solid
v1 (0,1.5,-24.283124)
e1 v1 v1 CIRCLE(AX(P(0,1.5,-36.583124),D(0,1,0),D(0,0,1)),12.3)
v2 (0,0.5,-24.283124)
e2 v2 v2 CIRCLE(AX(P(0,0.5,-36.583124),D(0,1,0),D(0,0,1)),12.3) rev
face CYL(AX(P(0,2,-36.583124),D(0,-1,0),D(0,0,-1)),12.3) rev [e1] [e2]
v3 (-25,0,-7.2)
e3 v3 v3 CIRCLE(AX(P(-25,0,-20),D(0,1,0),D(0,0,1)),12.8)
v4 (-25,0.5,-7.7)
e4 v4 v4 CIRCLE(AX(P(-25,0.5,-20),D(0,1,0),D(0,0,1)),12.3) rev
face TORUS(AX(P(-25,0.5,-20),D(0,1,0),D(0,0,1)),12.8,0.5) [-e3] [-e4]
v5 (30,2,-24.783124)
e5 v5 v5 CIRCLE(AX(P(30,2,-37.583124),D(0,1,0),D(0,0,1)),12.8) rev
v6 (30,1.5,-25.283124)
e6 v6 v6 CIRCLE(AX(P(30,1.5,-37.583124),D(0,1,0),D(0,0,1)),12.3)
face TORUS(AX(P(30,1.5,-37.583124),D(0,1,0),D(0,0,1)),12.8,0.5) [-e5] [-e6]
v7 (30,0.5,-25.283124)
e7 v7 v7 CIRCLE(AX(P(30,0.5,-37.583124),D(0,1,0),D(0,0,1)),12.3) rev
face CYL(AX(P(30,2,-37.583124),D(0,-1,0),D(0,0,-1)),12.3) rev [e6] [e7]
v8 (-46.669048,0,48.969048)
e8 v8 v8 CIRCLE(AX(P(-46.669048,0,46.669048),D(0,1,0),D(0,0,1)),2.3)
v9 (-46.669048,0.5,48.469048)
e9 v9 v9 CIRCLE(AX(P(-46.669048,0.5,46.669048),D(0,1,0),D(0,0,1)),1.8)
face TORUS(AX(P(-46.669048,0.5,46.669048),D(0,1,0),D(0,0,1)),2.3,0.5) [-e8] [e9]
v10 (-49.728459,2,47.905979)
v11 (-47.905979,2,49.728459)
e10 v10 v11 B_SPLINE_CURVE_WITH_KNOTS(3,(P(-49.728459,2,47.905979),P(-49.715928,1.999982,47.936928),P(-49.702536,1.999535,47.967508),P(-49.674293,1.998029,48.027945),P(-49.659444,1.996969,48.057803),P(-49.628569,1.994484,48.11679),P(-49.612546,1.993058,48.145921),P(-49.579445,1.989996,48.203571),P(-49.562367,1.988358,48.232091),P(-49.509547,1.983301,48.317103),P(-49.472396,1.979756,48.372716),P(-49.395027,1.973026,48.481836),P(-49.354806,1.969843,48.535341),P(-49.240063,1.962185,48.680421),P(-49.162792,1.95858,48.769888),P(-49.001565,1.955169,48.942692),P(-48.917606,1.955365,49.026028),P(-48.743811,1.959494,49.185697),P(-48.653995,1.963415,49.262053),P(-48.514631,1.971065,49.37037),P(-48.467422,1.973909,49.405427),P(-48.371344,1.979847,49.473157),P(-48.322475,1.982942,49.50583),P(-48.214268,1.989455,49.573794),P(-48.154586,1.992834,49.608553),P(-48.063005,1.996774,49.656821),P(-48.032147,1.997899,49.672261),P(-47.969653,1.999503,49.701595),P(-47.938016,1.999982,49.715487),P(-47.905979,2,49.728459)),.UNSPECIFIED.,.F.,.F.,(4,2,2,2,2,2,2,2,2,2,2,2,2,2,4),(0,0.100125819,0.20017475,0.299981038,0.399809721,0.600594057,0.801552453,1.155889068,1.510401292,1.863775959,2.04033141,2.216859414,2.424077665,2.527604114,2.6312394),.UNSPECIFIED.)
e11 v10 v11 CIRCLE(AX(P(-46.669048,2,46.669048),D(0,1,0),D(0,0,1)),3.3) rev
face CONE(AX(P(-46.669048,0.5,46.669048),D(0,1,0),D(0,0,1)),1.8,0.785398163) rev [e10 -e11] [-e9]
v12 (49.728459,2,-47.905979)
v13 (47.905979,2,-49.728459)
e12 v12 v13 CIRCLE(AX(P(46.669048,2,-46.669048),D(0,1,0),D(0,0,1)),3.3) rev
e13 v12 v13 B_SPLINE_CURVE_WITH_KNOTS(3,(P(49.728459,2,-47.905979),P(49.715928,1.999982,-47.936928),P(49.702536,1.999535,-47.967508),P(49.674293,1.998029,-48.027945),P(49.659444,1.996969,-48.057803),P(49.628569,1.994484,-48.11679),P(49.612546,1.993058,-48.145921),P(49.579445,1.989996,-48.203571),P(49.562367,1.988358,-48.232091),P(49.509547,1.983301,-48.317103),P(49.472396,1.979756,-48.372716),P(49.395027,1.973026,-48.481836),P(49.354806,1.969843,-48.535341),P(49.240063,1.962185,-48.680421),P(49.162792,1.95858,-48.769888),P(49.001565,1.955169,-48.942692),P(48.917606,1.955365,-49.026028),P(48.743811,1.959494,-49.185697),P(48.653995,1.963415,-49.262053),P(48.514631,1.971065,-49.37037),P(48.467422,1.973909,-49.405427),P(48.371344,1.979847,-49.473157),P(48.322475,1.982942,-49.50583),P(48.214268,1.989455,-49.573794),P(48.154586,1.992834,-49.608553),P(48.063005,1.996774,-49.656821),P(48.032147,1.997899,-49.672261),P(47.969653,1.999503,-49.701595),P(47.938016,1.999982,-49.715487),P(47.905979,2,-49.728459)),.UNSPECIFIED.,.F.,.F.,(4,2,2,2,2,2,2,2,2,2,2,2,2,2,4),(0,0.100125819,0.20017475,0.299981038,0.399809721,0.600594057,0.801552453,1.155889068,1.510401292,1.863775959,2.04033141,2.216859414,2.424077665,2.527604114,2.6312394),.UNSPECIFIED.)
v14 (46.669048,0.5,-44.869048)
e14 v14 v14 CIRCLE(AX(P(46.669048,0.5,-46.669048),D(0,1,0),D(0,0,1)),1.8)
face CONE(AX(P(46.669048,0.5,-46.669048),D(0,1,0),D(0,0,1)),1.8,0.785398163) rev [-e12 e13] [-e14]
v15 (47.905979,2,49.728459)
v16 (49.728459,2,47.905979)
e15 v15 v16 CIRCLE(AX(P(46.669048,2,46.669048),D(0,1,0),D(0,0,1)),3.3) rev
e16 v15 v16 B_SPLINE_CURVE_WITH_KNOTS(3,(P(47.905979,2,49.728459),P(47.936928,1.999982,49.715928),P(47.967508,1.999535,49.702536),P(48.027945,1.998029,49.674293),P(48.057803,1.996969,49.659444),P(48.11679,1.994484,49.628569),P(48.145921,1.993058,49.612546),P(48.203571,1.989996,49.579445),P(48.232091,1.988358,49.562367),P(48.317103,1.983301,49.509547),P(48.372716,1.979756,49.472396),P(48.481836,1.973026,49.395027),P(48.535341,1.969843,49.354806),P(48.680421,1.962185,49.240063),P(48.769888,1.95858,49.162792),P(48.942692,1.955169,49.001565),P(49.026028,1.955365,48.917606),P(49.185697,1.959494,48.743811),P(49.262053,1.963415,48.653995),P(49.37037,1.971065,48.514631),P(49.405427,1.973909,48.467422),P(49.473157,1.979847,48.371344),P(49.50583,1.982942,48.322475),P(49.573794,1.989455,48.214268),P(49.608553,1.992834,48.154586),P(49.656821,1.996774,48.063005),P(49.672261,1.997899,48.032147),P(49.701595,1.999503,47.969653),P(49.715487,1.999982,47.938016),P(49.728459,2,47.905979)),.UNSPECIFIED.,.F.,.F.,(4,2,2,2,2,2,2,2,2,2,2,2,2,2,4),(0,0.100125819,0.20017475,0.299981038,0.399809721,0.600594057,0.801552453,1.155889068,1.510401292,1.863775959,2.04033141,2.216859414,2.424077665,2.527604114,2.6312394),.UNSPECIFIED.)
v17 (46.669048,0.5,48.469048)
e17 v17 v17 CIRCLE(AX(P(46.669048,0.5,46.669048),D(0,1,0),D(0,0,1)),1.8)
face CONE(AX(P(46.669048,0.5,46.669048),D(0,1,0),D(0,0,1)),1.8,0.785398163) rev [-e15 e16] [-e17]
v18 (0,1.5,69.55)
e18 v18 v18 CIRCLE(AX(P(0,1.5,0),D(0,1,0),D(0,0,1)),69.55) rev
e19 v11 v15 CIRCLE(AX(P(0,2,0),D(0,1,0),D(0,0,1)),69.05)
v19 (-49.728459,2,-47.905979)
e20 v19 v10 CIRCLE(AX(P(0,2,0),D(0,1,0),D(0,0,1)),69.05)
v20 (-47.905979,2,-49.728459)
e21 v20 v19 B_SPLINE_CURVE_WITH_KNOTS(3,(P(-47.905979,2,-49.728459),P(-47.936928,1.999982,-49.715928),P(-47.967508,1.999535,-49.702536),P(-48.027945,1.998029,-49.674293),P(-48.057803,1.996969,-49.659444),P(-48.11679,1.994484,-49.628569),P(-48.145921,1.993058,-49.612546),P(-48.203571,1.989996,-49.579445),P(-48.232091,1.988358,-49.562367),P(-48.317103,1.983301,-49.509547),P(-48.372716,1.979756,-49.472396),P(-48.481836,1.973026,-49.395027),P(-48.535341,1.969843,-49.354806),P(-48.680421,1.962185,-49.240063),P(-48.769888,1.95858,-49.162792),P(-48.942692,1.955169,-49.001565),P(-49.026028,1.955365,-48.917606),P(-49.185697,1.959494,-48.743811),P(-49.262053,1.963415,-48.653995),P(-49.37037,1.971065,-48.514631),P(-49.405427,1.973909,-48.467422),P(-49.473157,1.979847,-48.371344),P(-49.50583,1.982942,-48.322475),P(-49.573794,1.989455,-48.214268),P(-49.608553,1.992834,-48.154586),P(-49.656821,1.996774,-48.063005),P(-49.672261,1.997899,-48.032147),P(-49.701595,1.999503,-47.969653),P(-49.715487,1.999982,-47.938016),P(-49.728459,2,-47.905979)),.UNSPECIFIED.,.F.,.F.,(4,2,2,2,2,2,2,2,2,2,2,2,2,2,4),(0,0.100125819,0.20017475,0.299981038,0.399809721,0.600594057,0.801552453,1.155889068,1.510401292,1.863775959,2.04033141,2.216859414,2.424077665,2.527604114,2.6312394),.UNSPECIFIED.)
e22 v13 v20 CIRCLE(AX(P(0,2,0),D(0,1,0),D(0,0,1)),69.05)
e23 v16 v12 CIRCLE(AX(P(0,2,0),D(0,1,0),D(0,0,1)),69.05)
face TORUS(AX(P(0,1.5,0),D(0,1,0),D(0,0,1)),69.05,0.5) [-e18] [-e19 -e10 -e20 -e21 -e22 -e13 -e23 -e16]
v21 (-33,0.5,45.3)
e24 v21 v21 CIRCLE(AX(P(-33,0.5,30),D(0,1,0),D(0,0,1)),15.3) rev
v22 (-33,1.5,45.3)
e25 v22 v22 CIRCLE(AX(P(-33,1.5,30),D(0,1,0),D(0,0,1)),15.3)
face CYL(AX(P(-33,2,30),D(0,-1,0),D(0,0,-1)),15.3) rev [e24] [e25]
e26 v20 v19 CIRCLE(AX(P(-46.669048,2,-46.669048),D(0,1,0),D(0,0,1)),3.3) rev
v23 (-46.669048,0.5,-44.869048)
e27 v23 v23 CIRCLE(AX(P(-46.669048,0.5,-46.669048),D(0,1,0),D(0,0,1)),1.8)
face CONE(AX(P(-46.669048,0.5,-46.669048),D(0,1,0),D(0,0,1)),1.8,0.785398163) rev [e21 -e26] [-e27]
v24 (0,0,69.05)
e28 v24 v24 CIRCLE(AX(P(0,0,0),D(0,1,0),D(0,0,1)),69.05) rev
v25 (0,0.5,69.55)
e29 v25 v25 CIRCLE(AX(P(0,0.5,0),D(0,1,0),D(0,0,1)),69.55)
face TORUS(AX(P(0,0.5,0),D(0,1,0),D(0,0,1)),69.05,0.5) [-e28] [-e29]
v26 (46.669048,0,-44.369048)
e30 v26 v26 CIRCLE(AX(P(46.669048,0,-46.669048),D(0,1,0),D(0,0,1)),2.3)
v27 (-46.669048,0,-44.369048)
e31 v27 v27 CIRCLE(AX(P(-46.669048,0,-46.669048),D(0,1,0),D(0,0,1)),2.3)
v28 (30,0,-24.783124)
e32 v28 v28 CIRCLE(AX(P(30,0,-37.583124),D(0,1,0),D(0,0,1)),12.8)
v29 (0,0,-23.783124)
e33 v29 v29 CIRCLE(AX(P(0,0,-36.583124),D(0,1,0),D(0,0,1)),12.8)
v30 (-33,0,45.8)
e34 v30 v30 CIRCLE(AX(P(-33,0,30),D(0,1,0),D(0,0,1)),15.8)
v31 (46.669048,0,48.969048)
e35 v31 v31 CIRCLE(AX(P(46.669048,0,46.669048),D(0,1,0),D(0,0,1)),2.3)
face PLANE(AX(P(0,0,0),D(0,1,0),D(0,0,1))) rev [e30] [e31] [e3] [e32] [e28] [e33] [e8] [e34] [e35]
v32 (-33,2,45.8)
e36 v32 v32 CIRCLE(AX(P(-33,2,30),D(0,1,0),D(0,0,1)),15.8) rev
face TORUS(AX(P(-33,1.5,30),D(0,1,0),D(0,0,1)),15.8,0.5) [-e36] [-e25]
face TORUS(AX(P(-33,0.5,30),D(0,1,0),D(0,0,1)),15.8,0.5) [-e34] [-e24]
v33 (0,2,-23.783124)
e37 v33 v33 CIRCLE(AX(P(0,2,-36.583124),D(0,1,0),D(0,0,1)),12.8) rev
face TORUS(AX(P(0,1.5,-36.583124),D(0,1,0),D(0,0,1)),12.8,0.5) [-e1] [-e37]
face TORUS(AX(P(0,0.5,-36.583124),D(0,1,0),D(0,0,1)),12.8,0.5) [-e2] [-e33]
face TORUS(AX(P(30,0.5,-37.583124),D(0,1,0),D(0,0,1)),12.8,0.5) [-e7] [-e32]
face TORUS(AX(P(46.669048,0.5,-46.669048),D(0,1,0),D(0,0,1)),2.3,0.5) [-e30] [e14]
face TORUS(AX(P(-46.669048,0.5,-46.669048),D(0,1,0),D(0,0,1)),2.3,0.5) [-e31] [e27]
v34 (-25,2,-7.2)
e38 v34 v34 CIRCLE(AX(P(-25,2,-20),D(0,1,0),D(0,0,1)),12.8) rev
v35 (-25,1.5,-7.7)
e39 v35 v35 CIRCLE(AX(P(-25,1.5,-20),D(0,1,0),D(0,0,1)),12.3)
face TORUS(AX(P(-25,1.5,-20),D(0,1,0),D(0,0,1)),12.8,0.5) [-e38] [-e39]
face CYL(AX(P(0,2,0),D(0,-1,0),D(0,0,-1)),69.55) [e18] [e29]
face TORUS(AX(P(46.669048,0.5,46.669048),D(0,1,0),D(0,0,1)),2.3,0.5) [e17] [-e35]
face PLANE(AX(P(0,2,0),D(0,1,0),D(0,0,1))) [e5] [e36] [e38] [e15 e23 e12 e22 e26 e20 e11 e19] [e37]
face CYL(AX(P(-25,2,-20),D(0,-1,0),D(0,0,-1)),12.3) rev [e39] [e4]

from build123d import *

# Parameters (mm, degrees)
SKETCH1_R           = 69.55
SKETCH1_R_2         = 1.8
SKETCH1_R_3         = 15.3
SKETCH1_R_4         = 12.3
BOSS_EXTRUDE1_DEPTH = 2
CHAMFER3_SIZE       = 1.5
FILLET1_R           = 0.5


with BuildPart() as part:
    # Sketch1 → Boss-Extrude1 (new body)
    with BuildSketch(Plane(origin=(0, 0, 0), x_dir=(1, 0, 0), z_dir=(0, 1, 0))):
        with Locations(Location((0, 0, 0), (0, 0, 270))):
            Circle(SKETCH1_R)
        with Locations(Location((-46.669047558, -46.669047558, 0), (0, 0, 270))):
            Circle(SKETCH1_R_2, mode=Mode.SUBTRACT)
        with Locations(Location((-33, -30, 0), (0, 0, 270))):
            Circle(SKETCH1_R_3, mode=Mode.SUBTRACT)
        with Locations(Location((46.669047558, -46.669047558, 0), (0, 0, 270))):
            Circle(SKETCH1_R_2, mode=Mode.SUBTRACT)
        with Locations(Location((-25, 20, 0), (0, 0, 270))):
            Circle(SKETCH1_R_4, mode=Mode.SUBTRACT)
        with Locations(Location((-46.669047558, 46.669047558, 0), (0, 0, 270))):
            Circle(SKETCH1_R_2, mode=Mode.SUBTRACT)
        with Locations(Location((0, 36.583123952, 0), (0, 0, 270))):
            Circle(SKETCH1_R_4, mode=Mode.SUBTRACT)
        with Locations(Location((30, 37.583123952, 0), (0, 0, 270))):
            Circle(SKETCH1_R_4, mode=Mode.SUBTRACT)
        with Locations(Location((46.669047558, 46.669047558, 0), (0, 0, 270))):
            Circle(SKETCH1_R_2, mode=Mode.SUBTRACT)
    extrude(amount=BOSS_EXTRUDE1_DEPTH)

    # Chamfer3
    chamfer3_edges = [part.edges().sort_by_distance(p)[0] for p in [
        (-46.669047558, 2, 44.869047558),
        (46.669047558, 2, 44.869047558),
        (46.669047558, 2, -48.469047558),
        (-46.669047558, 2, -48.469047558),
    ]]
    chamfer(chamfer3_edges, length=CHAMFER3_SIZE)

    # Fillet1
    # the kernel refuses this fillet: 0.5 mm, written as the material it takes off along each edge
    with BuildSketch(Plane(origin=(0, 0, 0), x_dir=(0, 0, 1), z_dir=(-1, 0, 0))) as fillet1_piece_1:
        with BuildLine():
            CenterArc((69.55 - FILLET1_R, FILLET1_R), FILLET1_R, 270, 90)
            Line((69.55, FILLET1_R), (69.55, 0))
            Line((69.55, 0), (69.55 - FILLET1_R, 0))
        make_face()
    revolve(axis=Axis((0, 0, 0), (0, 1, 0)), mode=Mode.SUBTRACT)
    with BuildSketch(Plane(origin=(-46.669047558, 0, -46.669047558), x_dir=(0, 0, 1), z_dir=(-1, 0, 0))) as fillet1_piece_2:
        with BuildLine():
            CenterArc((1.8 + FILLET1_R, FILLET1_R), FILLET1_R, 180, 90)
            Line((1.8, FILLET1_R), (1.8, 0))
            Line((1.8, 0), (1.8 + FILLET1_R, 0))
        make_face()
    revolve(axis=Axis((-46.669047558, 0, -46.669047558), (0, 1, 0)), mode=Mode.SUBTRACT)
    with BuildSketch(Plane(origin=(46.669047558, 0, -46.669047558), x_dir=(0, 0, 1), z_dir=(-1, 0, 0))) as fillet1_piece_3:
        with BuildLine():
            CenterArc((1.8 + FILLET1_R, FILLET1_R), FILLET1_R, 180, 90)
            Line((1.8, FILLET1_R), (1.8, 0))
            Line((1.8, 0), (1.8 + FILLET1_R, 0))
        make_face()
    revolve(axis=Axis((46.669047558, 0, -46.669047558), (0, 1, 0)), mode=Mode.SUBTRACT)
    with BuildSketch(Plane(origin=(46.669047558, 0, 46.669047558), x_dir=(0, 0, 1), z_dir=(-1, 0, 0))) as fillet1_piece_4:
        with BuildLine():
            CenterArc((1.8 + FILLET1_R, FILLET1_R), FILLET1_R, 180, 90)
            Line((1.8, FILLET1_R), (1.8, 0))
            Line((1.8, 0), (1.8 + FILLET1_R, 0))
        make_face()
    revolve(axis=Axis((46.669047558, 0, 46.669047558), (0, 1, 0)), mode=Mode.SUBTRACT)
    with BuildSketch(Plane(origin=(-33, 2, 30), x_dir=(0, 0, 1), z_dir=(-1, 0, 0))) as fillet1_piece_5:
        with BuildLine():
            CenterArc((15.3 + FILLET1_R, -FILLET1_R), FILLET1_R, 90, 90)
            Line((15.3, -FILLET1_R), (15.3, 0))
            Line((15.3, 0), (15.3 + FILLET1_R, 0))
        make_face()
    revolve(axis=Axis((-33, 2, 30), (0, 1, 0)), mode=Mode.SUBTRACT)
    with BuildSketch(Plane(origin=(-46.669047558, 0, 46.669047558), x_dir=(0, 0, 1), z_dir=(-1, 0, 0))) as fillet1_piece_6:
        with BuildLine():
            CenterArc((1.8 + FILLET1_R, FILLET1_R), FILLET1_R, 180, 90)
            Line((1.8 + FILLET1_R, 0), (1.8, 0))
            Line((1.8, 0), (1.8, FILLET1_R))
        make_face()
    revolve(axis=Axis((-46.669047558, 0, 46.669047558), (0, 1, 0)), mode=Mode.SUBTRACT)
    with BuildSketch(Plane(origin=(-25, 0, -20), x_dir=(0, 0, 1), z_dir=(-1, 0, 0))) as fillet1_piece_7:
        with BuildLine():
            CenterArc((12.3 + FILLET1_R, FILLET1_R), FILLET1_R, 180, 90)
            Line((12.3, FILLET1_R), (12.3, 0))
            Line((12.3, 0), (12.3 + FILLET1_R, 0))
        make_face()
    revolve(axis=Axis((-25, 0, -20), (0, 1, 0)), mode=Mode.SUBTRACT)
    with BuildSketch(Plane(origin=(0, 0, -36.583123952), x_dir=(0, 0, 1), z_dir=(-1, 0, 0))) as fillet1_piece_8:
        with BuildLine():
            CenterArc((12.3 + FILLET1_R, FILLET1_R), FILLET1_R, 180, 90)
            Line((12.3, FILLET1_R), (12.3, 0))
            Line((12.3, 0), (12.3 + FILLET1_R, 0))
        make_face()
    revolve(axis=Axis((0, 0, -36.583123952), (0, 1, 0)), mode=Mode.SUBTRACT)
    with BuildSketch(Plane(origin=(30, 0, -37.583123952), x_dir=(0, 0, 1), z_dir=(-1, 0, 0))) as fillet1_piece_9:
        with BuildLine():
            CenterArc((12.3 + FILLET1_R, FILLET1_R), FILLET1_R, 180, 90)
            Line((12.3, FILLET1_R), (12.3, 0))
            Line((12.3, 0), (12.3 + FILLET1_R, 0))
        make_face()
    revolve(axis=Axis((30, 0, -37.583123952), (0, 1, 0)), mode=Mode.SUBTRACT)
    with BuildSketch(Plane(origin=(-33, 0, 30), x_dir=(0, 0, 1), z_dir=(-1, 0, 0))) as fillet1_piece_10:
        with BuildLine():
            CenterArc((15.3 + FILLET1_R, FILLET1_R), FILLET1_R, 180, 90)
            Line((15.3, FILLET1_R), (15.3, 0))
            Line((15.3, 0), (15.3 + FILLET1_R, 0))
        make_face()
    revolve(axis=Axis((-33, 0, 30), (0, 1, 0)), mode=Mode.SUBTRACT)
    with BuildSketch(Plane(origin=(30, 2, -37.583123952), x_dir=(0, 0, 1), z_dir=(-1, 0, 0))) as fillet1_piece_11:
        with BuildLine():
            CenterArc((12.3 + FILLET1_R, -FILLET1_R), FILLET1_R, 90, 90)
            Line((12.3, -FILLET1_R), (12.3, 0))
            Line((12.3, 0), (12.3 + FILLET1_R, 0))
        make_face()
    revolve(axis=Axis((30, 2, -37.583123952), (0, 1, 0)), mode=Mode.SUBTRACT)
    with BuildSketch(Plane(origin=(0, 2, -36.583123952), x_dir=(0, 0, 1), z_dir=(-1, 0, 0))) as fillet1_piece_12:
        with BuildLine():
            CenterArc((12.3 + FILLET1_R, -FILLET1_R), FILLET1_R, 90, 90)
            Line((12.3, -FILLET1_R), (12.3, 0))
            Line((12.3, 0), (12.3 + FILLET1_R, 0))
        make_face()
    revolve(axis=Axis((0, 2, -36.583123952), (0, 1, 0)), mode=Mode.SUBTRACT)
    with BuildSketch(Plane(origin=(-25, 2, -20), x_dir=(0, 0, 1), z_dir=(-1, 0, 0))) as fillet1_piece_13:
        with BuildLine():
            CenterArc((12.3 + FILLET1_R, -FILLET1_R), FILLET1_R, 90, 90)
            Line((12.3, -FILLET1_R), (12.3, 0))
            Line((12.3, 0), (12.3 + FILLET1_R, 0))
        make_face()
    revolve(axis=Axis((-25, 2, -20), (0, 1, 0)), mode=Mode.SUBTRACT)
    with BuildSketch(Plane(origin=(0, 2, 0), x_dir=(0, 0, 1), z_dir=(-1, 0, 0))) as fillet1_piece_14:
        with BuildLine():
            CenterArc((69.55 - FILLET1_R, -FILLET1_R), FILLET1_R, 0, 90)
            Line((69.55, -FILLET1_R), (69.55, 0))
            Line((69.55, 0), (69.55 - FILLET1_R, 0))
        make_face()
    revolve(axis=Axis((0, 2, 0), (0, 1, 0)), mode=Mode.SUBTRACT)


solid = part.part
